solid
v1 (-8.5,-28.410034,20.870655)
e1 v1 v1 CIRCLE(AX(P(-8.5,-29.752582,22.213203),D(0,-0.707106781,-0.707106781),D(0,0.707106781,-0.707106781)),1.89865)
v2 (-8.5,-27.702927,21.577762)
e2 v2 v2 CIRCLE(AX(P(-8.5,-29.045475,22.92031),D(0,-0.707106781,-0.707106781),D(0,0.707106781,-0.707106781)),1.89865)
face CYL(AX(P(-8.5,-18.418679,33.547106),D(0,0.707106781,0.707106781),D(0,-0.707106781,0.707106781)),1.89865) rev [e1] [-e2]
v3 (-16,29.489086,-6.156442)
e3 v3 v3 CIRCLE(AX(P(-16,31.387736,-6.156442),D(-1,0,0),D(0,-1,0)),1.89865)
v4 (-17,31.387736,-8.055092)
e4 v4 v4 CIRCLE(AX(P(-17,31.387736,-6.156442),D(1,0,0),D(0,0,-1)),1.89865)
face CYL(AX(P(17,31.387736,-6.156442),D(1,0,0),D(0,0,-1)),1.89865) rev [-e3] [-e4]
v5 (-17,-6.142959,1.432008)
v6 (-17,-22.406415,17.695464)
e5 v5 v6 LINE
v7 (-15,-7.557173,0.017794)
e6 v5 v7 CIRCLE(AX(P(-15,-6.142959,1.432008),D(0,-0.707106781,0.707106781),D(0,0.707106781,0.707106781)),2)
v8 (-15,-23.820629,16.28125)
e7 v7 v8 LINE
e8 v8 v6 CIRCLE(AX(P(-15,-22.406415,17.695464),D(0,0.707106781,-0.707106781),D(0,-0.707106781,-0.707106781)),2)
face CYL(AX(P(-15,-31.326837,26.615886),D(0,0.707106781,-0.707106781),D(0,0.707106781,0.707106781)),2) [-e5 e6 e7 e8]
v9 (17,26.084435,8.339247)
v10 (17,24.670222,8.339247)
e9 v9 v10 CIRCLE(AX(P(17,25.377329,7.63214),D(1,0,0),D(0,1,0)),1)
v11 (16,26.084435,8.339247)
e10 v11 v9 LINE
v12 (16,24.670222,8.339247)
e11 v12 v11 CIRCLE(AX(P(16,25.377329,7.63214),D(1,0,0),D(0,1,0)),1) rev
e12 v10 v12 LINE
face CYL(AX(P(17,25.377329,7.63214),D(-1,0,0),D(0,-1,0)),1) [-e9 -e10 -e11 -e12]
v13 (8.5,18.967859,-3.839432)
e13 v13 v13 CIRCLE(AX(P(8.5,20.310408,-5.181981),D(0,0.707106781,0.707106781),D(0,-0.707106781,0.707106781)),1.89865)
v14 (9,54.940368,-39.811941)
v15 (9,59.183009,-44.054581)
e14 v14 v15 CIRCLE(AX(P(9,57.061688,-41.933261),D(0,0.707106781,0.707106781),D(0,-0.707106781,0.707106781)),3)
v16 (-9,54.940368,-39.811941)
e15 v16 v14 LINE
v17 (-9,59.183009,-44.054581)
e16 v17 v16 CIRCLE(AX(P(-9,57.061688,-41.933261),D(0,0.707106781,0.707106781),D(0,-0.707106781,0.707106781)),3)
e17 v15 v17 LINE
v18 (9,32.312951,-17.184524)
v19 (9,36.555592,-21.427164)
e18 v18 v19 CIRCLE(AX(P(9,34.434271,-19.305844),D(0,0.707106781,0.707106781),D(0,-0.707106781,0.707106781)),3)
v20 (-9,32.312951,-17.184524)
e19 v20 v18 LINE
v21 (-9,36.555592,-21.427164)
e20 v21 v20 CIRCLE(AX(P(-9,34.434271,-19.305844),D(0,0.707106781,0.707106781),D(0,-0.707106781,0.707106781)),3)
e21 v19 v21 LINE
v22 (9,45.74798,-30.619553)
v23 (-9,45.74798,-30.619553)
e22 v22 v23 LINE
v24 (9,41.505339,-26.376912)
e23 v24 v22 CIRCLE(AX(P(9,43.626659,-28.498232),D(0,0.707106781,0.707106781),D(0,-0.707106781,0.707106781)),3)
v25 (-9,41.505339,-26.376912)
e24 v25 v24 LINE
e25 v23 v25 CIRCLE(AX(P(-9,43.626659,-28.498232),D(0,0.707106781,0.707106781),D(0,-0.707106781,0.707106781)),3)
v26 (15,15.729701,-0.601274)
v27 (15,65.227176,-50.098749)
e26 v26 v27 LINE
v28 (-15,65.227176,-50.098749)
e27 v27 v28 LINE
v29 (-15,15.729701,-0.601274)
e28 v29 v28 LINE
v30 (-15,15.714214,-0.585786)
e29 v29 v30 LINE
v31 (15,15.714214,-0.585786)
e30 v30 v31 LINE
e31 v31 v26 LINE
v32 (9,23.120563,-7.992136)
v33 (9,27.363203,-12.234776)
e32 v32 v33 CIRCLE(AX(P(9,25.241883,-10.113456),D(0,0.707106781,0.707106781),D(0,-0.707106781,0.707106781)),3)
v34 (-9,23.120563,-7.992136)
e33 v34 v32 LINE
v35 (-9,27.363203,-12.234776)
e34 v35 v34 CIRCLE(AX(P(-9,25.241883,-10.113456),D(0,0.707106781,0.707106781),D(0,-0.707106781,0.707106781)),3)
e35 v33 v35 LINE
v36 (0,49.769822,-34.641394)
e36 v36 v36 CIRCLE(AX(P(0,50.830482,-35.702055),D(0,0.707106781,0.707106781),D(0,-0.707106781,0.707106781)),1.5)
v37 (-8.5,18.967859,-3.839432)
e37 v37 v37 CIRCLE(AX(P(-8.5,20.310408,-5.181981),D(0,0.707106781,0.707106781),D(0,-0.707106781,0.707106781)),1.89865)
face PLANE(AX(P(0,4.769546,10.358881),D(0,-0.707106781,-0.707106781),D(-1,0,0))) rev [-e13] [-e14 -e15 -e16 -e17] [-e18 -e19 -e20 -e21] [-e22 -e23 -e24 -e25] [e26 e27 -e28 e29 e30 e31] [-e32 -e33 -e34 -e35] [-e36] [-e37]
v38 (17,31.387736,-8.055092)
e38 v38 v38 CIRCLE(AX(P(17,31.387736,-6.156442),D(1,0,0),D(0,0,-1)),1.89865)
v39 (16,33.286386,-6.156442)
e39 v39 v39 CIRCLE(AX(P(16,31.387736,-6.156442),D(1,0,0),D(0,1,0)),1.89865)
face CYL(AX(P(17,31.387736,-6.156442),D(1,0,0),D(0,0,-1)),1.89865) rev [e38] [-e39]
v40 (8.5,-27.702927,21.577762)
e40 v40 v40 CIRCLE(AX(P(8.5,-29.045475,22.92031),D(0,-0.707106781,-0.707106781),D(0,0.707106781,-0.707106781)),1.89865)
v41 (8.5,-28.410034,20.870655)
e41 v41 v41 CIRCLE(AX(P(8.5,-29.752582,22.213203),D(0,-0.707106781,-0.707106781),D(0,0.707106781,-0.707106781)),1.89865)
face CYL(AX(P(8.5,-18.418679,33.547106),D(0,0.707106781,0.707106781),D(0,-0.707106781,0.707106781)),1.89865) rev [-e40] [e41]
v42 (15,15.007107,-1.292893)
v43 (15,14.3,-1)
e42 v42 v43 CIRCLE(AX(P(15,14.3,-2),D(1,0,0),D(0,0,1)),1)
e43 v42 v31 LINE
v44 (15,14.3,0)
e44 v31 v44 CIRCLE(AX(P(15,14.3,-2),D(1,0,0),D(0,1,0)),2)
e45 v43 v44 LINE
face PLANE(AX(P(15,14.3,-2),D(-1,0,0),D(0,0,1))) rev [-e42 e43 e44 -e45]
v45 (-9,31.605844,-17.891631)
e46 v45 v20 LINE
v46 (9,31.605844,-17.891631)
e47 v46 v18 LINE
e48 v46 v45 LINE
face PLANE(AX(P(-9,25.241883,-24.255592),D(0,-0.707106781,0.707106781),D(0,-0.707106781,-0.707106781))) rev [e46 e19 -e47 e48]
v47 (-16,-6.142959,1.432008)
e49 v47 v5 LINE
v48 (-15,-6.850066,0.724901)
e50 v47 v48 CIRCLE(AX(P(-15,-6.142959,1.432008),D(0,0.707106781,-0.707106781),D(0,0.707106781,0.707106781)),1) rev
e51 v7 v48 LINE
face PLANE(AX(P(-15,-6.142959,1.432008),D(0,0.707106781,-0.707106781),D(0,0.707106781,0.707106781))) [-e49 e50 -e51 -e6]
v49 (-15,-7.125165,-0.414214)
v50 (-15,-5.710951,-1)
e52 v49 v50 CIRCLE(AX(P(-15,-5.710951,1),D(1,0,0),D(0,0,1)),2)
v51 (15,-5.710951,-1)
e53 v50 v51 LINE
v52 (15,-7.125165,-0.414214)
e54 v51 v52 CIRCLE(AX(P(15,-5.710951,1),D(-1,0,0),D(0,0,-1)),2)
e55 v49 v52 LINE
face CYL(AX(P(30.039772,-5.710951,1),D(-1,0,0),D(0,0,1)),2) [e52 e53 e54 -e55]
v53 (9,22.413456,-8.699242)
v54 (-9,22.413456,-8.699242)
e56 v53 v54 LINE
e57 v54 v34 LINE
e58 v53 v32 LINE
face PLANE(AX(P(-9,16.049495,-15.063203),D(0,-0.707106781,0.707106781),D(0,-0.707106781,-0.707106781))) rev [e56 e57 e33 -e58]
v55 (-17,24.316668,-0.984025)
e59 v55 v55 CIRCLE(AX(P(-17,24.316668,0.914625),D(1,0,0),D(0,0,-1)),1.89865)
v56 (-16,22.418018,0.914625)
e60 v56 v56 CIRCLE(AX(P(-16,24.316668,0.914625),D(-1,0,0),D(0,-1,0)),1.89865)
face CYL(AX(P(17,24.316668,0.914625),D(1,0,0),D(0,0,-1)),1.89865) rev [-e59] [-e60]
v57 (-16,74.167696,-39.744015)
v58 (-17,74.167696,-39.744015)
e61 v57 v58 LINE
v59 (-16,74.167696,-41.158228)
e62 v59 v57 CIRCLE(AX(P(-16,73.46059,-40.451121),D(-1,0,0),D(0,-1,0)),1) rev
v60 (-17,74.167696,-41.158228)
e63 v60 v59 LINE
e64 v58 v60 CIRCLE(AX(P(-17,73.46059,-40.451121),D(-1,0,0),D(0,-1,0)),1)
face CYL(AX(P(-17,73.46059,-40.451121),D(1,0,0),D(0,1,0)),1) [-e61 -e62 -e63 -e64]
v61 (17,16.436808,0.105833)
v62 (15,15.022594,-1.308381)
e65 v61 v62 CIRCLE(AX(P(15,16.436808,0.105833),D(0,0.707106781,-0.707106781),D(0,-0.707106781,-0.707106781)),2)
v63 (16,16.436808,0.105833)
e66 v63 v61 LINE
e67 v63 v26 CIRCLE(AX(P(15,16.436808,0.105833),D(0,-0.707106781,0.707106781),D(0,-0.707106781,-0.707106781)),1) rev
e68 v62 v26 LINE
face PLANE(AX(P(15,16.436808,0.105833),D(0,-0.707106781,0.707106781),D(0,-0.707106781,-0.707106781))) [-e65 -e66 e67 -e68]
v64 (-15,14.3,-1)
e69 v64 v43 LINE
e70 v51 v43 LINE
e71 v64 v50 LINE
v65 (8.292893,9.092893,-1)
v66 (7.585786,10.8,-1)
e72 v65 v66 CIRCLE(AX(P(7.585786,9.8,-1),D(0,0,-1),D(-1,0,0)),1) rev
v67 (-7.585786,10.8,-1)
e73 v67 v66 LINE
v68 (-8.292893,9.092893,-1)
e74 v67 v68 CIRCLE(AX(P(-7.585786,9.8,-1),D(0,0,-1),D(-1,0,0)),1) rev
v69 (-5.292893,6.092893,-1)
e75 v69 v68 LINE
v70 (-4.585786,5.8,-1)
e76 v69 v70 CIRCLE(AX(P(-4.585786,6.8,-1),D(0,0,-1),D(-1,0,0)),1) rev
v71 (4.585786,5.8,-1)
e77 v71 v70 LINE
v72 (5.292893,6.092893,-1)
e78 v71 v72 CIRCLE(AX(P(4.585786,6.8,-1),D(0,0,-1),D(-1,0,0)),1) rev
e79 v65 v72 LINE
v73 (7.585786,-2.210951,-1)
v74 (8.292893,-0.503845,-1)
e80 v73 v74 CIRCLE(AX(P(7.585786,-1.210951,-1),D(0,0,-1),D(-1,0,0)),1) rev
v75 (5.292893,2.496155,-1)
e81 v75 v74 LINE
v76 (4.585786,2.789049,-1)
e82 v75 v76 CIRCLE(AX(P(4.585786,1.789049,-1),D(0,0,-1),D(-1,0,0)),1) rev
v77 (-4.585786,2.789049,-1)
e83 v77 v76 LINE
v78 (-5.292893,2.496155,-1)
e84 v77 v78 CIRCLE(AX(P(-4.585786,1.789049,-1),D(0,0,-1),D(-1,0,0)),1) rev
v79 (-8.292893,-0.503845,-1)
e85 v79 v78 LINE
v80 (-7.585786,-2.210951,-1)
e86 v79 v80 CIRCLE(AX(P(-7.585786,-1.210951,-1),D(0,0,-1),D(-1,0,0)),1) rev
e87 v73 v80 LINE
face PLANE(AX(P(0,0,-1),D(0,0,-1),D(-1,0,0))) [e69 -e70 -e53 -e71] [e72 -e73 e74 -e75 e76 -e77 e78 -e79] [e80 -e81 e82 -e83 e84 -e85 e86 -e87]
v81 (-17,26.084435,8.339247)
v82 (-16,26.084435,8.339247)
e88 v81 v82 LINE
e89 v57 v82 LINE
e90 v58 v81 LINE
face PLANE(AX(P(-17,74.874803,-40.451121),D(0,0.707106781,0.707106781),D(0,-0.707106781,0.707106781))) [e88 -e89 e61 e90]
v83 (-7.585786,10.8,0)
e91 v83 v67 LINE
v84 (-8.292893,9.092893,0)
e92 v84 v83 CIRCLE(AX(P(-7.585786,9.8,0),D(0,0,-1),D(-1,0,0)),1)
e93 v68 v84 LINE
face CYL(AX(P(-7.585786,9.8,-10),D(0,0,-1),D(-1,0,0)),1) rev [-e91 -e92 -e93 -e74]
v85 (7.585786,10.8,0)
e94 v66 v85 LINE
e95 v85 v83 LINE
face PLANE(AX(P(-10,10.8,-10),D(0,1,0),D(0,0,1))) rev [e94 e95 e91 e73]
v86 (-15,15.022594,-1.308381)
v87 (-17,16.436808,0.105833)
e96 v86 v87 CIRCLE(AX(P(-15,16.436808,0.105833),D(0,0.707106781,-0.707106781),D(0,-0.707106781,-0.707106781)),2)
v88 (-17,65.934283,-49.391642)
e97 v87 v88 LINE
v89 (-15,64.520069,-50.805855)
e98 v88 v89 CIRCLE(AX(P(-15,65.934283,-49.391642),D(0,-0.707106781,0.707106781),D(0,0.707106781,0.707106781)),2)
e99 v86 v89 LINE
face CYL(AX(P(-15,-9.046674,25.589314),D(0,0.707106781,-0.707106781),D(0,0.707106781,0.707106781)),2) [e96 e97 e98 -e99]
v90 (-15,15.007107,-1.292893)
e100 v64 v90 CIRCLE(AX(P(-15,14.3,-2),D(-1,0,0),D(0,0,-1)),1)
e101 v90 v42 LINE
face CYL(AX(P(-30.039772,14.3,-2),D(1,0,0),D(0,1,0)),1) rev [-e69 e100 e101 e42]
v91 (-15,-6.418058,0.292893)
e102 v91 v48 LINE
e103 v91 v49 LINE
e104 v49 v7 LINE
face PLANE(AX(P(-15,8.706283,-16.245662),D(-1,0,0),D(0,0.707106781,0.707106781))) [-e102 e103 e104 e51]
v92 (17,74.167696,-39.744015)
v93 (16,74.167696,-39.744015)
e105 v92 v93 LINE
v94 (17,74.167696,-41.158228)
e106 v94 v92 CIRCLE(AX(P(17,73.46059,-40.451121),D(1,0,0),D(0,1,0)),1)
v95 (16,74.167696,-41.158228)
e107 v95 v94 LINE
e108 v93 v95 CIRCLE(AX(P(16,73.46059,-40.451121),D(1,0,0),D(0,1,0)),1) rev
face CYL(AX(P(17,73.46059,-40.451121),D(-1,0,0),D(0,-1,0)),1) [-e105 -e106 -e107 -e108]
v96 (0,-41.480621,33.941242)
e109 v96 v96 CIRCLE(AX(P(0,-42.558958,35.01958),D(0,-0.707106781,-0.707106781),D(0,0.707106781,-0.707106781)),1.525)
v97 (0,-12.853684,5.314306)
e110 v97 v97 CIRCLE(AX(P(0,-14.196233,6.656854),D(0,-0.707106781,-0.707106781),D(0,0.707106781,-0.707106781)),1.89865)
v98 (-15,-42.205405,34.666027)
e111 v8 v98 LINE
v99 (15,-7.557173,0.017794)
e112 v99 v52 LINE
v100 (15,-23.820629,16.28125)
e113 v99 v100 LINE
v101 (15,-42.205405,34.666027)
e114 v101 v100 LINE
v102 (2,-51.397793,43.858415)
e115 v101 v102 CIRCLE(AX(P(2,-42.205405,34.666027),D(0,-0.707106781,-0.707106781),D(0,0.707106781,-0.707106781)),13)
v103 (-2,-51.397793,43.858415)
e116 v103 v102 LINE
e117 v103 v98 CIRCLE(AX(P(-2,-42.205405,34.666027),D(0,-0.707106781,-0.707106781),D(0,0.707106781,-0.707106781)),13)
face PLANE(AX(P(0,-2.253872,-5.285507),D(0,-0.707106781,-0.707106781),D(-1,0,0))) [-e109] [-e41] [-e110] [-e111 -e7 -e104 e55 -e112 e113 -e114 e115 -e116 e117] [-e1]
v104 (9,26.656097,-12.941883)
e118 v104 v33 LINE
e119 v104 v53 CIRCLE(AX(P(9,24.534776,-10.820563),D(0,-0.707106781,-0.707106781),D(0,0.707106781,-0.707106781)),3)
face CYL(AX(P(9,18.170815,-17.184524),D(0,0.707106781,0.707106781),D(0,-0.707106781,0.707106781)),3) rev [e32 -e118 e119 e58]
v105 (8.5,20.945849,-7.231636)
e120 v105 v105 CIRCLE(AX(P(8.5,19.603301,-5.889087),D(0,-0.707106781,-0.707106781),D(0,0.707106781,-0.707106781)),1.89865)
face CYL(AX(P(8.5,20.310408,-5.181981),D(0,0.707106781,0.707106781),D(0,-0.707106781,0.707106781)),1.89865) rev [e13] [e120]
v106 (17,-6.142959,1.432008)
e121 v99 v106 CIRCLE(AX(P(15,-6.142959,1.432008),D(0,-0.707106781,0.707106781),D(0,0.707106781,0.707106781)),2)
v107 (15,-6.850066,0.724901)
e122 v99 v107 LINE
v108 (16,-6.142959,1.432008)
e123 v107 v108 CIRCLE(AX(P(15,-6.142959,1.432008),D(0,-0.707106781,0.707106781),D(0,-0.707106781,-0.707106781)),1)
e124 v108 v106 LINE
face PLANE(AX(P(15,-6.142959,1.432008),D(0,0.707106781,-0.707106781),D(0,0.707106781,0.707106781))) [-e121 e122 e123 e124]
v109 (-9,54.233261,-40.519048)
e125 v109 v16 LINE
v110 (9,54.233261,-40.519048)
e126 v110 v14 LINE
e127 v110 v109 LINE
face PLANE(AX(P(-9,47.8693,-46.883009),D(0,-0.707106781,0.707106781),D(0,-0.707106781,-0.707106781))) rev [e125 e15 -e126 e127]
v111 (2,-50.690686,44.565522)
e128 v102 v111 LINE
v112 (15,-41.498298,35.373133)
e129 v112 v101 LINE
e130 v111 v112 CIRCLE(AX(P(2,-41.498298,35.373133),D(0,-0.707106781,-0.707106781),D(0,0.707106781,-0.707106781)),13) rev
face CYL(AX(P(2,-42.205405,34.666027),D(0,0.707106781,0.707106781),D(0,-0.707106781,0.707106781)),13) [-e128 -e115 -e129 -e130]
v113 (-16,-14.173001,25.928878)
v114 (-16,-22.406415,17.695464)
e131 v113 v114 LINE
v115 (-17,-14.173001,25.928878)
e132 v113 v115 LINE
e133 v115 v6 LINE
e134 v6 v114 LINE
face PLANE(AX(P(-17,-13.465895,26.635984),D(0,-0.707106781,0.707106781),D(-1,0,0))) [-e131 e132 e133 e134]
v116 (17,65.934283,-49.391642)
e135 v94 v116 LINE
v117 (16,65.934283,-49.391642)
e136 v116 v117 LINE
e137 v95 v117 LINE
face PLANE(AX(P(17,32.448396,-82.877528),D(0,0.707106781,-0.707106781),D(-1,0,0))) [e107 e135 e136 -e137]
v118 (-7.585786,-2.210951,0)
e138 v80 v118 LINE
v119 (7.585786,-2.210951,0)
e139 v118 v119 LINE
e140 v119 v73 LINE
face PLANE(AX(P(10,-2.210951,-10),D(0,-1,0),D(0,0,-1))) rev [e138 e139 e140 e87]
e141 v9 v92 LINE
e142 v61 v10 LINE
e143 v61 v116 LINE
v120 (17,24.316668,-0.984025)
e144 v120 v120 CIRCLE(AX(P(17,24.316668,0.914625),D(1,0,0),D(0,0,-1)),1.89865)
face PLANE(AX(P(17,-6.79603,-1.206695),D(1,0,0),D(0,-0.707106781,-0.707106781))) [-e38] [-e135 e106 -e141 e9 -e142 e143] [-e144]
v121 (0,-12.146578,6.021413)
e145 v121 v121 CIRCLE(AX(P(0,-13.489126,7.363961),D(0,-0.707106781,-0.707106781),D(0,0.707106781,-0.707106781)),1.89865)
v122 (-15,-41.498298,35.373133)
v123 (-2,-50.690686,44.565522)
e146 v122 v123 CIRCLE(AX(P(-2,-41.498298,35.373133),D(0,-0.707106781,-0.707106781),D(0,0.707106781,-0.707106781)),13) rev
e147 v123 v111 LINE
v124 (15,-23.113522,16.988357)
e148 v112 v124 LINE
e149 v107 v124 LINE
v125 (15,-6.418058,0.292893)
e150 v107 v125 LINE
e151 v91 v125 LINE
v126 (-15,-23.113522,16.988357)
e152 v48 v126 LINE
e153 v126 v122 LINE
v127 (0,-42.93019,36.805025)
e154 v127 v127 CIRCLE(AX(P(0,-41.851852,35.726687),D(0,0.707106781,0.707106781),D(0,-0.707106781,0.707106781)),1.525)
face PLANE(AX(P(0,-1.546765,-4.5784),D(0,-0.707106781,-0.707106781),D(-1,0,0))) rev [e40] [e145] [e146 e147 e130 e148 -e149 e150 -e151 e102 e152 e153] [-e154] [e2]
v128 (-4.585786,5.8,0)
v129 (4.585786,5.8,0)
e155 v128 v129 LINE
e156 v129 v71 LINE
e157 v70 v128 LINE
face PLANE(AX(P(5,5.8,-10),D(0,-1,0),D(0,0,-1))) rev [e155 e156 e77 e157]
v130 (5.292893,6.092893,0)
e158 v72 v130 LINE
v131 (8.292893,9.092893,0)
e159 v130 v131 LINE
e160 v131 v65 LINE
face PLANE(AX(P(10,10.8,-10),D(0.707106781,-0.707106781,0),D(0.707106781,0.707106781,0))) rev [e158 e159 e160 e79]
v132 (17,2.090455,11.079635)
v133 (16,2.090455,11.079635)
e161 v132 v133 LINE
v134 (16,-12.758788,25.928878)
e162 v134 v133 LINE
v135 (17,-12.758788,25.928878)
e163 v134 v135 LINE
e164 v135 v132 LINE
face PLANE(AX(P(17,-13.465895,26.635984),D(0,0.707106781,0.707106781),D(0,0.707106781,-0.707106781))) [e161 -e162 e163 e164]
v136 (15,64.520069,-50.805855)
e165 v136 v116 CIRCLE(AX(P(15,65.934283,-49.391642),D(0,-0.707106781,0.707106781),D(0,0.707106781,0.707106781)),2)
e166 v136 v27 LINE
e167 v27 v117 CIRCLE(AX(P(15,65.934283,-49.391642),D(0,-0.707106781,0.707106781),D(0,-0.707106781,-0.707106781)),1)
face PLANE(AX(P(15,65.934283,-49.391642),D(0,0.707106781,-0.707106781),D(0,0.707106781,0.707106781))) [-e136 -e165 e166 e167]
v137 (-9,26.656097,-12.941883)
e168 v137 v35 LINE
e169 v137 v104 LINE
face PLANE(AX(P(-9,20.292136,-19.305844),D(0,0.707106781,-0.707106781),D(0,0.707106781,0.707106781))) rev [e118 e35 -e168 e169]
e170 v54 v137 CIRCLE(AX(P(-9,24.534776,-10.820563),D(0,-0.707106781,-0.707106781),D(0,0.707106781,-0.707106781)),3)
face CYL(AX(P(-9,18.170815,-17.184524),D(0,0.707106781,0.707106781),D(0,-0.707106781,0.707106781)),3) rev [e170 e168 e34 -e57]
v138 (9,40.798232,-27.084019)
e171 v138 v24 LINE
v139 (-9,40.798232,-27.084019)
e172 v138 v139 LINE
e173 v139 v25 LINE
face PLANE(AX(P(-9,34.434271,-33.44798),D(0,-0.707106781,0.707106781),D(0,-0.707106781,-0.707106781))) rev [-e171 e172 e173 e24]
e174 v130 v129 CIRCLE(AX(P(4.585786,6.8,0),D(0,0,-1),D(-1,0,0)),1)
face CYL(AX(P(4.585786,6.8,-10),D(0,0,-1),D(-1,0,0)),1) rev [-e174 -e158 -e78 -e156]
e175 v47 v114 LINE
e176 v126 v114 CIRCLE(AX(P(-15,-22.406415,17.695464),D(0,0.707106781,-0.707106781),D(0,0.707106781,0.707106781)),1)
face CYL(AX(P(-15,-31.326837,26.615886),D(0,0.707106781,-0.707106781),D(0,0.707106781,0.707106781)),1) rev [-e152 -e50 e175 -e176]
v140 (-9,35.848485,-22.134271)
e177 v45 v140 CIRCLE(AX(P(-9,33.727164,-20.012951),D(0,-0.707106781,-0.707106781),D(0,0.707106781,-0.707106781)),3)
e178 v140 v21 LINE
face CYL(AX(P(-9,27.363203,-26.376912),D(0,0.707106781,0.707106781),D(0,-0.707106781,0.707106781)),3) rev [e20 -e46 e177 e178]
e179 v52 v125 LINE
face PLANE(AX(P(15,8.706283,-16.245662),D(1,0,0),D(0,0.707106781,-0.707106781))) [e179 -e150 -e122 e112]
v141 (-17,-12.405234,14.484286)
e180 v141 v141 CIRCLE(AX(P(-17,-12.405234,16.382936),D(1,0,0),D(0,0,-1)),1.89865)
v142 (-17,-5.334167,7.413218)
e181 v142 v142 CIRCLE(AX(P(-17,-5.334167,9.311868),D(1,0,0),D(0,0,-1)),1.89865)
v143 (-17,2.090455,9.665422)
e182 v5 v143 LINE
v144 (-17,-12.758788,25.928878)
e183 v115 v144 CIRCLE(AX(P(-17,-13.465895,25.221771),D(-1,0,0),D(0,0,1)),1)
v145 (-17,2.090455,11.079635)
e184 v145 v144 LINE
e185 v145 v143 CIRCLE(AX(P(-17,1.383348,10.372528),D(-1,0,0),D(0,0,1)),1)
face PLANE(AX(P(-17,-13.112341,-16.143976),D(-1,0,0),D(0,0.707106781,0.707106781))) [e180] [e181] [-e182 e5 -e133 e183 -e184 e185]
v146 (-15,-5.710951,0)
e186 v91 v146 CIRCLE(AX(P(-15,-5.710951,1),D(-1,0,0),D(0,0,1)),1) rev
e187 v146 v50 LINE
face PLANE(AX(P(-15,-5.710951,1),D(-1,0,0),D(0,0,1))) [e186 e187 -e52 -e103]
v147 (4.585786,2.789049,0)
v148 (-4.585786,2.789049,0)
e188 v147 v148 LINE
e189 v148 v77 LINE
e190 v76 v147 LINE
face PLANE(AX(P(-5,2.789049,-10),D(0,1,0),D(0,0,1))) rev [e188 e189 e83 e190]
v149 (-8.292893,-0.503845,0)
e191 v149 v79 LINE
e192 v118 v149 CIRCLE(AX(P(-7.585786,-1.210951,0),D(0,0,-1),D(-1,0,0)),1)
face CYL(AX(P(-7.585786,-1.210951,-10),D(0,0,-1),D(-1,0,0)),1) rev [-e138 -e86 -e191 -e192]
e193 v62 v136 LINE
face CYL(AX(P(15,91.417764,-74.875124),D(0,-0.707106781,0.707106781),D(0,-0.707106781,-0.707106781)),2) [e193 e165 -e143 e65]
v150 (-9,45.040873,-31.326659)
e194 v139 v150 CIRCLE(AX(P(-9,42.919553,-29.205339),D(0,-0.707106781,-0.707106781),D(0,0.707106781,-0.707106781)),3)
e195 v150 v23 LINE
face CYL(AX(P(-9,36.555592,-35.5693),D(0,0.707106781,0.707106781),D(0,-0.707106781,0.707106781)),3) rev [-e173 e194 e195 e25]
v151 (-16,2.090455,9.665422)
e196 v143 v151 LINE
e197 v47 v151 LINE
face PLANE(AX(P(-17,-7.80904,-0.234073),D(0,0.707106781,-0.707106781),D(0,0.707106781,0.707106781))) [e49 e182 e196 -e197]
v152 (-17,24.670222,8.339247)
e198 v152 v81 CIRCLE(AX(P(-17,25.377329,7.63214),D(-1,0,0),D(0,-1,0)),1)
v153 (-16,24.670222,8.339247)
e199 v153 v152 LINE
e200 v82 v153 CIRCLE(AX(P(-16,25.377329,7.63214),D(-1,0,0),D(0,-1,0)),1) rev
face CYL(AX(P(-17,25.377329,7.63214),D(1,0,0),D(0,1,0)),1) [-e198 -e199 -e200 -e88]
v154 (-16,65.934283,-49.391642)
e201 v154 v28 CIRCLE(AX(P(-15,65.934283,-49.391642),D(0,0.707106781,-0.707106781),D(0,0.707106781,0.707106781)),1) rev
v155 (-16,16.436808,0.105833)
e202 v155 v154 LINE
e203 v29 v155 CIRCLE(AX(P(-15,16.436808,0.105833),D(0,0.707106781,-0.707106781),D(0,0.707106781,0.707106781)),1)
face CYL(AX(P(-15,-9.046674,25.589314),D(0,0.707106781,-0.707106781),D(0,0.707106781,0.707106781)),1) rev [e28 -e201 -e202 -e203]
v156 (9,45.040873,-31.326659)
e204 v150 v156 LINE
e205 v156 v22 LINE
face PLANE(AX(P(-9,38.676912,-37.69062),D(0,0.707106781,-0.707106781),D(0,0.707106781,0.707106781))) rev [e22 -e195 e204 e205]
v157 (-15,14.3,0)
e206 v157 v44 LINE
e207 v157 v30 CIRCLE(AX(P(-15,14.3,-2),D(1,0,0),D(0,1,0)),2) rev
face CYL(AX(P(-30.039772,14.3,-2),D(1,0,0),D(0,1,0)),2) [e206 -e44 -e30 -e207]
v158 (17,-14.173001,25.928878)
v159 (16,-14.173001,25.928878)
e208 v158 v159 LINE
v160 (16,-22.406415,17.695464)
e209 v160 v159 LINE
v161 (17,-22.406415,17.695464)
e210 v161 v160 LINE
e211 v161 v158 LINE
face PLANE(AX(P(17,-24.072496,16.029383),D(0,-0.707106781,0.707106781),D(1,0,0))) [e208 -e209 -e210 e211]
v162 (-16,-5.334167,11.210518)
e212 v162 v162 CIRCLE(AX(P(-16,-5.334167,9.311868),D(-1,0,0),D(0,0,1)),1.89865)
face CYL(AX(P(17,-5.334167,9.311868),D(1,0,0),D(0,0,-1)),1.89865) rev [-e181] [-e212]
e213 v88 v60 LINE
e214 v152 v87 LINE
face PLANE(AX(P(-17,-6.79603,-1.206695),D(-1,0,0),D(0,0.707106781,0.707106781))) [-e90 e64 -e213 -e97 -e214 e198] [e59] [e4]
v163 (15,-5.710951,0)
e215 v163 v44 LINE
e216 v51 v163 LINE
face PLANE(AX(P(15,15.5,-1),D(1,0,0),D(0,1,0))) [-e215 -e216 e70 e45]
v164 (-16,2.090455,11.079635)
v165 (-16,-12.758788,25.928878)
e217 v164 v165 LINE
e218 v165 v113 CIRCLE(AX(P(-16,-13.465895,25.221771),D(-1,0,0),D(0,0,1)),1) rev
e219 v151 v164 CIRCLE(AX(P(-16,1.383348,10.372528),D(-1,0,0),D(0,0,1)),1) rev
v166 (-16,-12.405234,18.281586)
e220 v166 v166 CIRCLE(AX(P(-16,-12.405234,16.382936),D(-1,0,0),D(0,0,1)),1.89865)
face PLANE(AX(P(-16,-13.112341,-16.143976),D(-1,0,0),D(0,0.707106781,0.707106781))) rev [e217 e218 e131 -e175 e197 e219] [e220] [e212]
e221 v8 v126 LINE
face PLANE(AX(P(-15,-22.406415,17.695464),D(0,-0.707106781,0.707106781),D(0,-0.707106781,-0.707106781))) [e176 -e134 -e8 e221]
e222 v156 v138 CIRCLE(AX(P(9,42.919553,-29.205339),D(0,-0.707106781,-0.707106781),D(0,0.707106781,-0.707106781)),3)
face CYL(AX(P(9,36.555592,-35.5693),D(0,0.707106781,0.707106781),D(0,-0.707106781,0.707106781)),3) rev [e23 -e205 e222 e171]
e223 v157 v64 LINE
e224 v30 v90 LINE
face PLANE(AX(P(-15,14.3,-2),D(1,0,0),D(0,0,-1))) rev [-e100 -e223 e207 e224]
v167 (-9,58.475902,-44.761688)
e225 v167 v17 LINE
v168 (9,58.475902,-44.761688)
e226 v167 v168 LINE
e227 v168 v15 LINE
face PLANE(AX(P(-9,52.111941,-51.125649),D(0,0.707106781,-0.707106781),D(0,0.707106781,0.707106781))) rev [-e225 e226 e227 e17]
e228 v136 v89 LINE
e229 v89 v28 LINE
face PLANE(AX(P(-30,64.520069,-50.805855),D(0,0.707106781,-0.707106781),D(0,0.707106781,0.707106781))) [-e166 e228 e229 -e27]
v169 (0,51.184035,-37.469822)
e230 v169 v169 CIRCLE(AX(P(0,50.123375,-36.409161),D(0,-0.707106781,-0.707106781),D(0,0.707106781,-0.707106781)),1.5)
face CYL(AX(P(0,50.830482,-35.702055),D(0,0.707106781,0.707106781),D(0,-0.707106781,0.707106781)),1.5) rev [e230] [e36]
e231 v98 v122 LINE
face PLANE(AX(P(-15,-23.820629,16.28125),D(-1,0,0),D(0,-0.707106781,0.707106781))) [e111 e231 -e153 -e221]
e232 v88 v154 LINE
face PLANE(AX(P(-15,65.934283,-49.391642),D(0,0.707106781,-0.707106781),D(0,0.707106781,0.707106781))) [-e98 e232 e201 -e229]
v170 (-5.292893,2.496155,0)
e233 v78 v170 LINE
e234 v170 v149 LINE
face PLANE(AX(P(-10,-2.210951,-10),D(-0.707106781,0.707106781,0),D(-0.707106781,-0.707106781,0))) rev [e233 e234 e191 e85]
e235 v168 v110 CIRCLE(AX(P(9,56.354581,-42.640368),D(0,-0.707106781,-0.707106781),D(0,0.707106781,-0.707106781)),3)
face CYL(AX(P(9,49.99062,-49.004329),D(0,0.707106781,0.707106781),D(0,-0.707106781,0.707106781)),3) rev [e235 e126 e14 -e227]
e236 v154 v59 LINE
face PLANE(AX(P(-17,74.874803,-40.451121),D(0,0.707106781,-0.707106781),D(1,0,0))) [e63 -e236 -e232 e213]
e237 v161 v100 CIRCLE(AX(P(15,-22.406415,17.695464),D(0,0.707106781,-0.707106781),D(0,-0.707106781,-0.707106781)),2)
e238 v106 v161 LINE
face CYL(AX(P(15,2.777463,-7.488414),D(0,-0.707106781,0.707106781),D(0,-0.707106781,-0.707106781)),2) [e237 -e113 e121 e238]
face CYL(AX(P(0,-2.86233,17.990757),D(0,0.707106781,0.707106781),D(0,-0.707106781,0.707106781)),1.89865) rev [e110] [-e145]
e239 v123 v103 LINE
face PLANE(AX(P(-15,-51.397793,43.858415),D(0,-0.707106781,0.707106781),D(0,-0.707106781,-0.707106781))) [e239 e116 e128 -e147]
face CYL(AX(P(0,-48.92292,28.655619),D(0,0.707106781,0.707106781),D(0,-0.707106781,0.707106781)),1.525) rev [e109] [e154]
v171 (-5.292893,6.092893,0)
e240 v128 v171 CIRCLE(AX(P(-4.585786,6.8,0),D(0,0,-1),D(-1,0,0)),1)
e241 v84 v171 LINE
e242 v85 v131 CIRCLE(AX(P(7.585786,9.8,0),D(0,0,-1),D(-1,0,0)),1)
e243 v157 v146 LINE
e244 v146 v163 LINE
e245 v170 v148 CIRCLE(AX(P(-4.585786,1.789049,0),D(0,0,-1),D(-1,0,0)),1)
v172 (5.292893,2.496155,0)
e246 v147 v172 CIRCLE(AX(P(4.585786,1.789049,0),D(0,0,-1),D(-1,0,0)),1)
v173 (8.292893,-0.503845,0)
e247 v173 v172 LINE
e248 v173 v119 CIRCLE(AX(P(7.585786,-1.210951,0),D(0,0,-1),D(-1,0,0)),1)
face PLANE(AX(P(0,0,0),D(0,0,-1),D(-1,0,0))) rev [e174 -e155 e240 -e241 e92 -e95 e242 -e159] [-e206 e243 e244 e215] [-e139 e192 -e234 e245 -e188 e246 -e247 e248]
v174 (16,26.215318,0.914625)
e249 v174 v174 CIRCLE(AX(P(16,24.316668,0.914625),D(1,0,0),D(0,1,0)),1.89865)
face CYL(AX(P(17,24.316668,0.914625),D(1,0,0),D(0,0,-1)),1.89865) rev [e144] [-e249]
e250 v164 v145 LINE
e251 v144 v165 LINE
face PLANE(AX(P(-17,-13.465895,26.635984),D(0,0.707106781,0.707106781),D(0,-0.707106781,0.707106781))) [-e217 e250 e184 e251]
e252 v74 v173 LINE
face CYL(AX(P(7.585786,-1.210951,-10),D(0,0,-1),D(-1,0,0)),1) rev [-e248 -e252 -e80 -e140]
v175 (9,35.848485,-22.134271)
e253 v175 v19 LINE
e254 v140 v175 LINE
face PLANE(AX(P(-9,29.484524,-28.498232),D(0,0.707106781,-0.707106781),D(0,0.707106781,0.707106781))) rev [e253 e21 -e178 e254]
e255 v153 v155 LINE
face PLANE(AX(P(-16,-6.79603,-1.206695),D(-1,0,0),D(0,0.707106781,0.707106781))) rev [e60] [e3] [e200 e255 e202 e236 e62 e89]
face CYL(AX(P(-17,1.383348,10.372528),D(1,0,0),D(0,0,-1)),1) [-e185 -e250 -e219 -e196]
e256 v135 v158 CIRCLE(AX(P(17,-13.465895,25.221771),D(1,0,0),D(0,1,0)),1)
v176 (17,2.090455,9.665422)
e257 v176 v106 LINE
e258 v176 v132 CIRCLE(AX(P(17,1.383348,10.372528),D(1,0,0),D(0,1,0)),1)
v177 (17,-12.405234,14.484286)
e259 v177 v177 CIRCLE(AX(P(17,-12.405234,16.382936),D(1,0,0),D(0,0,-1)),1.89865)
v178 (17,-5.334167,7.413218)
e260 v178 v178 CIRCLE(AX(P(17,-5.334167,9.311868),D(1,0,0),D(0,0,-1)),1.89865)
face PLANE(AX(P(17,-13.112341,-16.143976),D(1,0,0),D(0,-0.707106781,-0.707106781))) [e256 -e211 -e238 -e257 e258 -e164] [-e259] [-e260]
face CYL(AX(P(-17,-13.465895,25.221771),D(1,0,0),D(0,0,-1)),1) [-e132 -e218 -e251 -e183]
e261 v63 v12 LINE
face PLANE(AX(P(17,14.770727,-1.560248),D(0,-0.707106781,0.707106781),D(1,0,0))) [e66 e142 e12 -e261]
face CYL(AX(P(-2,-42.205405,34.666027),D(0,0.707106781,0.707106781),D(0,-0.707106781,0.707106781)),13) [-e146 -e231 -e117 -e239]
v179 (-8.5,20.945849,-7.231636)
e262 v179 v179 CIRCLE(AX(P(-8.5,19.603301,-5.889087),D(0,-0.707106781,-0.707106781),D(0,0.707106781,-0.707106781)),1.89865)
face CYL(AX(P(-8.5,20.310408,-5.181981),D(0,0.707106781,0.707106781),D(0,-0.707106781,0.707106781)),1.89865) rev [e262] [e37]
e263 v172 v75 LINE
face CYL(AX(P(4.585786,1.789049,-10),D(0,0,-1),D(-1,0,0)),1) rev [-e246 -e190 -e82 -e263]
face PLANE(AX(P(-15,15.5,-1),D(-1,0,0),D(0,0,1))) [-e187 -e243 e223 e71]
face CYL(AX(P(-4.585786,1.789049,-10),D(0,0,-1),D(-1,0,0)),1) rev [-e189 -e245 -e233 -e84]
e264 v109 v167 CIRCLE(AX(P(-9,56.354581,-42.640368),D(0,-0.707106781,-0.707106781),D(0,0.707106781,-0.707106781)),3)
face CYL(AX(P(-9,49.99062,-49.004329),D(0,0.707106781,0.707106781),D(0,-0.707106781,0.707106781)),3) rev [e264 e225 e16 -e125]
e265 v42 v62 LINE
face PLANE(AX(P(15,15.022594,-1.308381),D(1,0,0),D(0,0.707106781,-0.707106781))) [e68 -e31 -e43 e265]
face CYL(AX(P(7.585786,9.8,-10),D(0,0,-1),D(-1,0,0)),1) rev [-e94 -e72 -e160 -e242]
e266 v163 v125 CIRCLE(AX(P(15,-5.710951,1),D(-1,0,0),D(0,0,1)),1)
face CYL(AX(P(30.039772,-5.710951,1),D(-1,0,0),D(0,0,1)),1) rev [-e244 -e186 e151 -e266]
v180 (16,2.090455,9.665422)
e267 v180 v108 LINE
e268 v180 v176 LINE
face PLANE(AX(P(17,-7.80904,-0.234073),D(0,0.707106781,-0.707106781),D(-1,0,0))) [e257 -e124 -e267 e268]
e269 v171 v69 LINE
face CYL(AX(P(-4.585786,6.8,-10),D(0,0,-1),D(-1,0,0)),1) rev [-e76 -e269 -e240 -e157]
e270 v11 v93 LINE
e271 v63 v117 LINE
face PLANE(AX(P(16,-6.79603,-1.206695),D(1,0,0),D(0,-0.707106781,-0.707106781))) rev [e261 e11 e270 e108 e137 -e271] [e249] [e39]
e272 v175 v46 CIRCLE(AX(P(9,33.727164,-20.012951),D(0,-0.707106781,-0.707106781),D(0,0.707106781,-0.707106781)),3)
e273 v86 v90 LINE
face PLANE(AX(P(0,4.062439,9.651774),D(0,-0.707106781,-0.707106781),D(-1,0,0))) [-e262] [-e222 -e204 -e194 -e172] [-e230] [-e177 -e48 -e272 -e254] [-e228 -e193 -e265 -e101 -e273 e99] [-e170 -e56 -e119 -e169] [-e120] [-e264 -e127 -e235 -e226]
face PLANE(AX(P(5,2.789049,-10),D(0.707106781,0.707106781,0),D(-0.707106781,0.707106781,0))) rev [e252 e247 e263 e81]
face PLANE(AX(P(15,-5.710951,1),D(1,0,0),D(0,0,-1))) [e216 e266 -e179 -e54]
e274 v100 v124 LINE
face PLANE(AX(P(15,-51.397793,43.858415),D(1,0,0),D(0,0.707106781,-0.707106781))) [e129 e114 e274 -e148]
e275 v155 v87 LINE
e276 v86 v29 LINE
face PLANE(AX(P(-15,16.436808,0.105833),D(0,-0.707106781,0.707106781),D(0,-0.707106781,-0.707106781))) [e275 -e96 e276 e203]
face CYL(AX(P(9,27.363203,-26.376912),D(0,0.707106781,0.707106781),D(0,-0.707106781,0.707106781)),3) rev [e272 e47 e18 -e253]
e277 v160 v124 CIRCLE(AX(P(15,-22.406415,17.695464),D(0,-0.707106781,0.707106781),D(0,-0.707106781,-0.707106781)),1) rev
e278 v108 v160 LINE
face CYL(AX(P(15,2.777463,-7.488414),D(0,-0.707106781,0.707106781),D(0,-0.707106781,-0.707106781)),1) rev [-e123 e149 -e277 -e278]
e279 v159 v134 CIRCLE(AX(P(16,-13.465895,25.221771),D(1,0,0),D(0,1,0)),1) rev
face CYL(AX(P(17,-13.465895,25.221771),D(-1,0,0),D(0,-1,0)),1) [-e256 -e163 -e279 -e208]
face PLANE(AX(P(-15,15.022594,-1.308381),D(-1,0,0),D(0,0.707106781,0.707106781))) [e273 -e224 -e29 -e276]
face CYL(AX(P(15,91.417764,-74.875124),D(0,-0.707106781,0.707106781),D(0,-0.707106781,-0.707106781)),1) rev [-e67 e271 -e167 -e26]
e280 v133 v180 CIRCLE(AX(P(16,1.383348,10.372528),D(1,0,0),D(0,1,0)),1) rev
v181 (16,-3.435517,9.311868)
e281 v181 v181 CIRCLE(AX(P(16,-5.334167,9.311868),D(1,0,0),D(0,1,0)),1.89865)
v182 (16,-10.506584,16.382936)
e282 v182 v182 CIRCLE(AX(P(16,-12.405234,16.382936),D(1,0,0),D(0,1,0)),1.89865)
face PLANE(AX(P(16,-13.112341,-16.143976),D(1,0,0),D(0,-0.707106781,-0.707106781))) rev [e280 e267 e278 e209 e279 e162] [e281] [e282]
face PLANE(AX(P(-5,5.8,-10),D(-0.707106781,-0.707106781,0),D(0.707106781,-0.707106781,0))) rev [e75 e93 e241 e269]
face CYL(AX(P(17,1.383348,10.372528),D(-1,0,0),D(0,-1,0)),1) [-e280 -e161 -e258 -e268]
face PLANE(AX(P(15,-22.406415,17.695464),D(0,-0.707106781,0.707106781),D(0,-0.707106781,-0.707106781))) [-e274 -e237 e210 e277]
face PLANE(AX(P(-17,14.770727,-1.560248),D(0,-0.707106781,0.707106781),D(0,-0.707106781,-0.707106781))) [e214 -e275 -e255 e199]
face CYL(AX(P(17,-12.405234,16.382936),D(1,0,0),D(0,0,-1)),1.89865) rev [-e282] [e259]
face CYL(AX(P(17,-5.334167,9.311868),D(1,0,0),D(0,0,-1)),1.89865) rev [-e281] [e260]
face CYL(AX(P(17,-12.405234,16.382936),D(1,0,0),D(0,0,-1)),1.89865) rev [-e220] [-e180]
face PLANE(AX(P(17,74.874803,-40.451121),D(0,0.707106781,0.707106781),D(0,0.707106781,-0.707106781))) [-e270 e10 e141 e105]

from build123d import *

# Parameters (mm, degrees)
BASE_FLANGE1_DEPTH     = 1
SKETCHED_START         = -30
SKETCHED_BEND5_DEPTH   = 60
SKETCHED_BEND5_2_DEPTH = 15
SKETCHED_START_2       = 15
SKETCHED_BEND5_3_DEPTH = 15
SKETCHED_BEND5_4_DEPTH = 60
SKETCHED_START_3       = -15
SKETCHED_BEND5_5_DEPTH = 30
SKETCHED_BEND6_DEPTH   = 60
SKETCHED_BEND6_2_DEPTH = 15
SKETCHED_BEND6_3_DEPTH = 15
SKETCHED_BEND6_4_DEPTH = 30
SKETCHED_BEND6_5_DEPTH = 60
SKETCHED_START_4       = -28.356310605
SKETCHED_BEND7_DEPTH   = 23
SKETCHED_BEND7_2_DEPTH = 23
SKETCHED_START_5       = 11.547743288
SKETCHED_BEND8_DEPTH   = 70
SKETCHED_BEND8_2_DEPTH = 70
CUT_EXTRUDE1_DEPTH     = 10
F_6_CLEARANCE_HOLE4_D  = 3.7973
F_6_CLEARANCE_HOLE2_D  = 3.7973
F_3_0MM_DOWEL_HOLE1_D  = 3
SKETCH47_R             = 1.525
CUT_EXTRUDE2_DEPTH     = 10
CUT_EXTRUDE3_DEPTH     = 10
FILLET2_R              = 13
FILLET1_R              = 1


# Read off the part's stored shape, not the designer's step: Sketched Bend5, Sketched Bend6, Sketched Bend7, Sketched Bend8
# Sheet-metal steps are written as plain solids
with BuildPart() as part:
    # Sketch1 → Base-Flange1 (new body)
    with BuildSketch(Plane.XY):
        Polygon((-30, -30.5), (-15, -30.5), (-15, -69.5), (15, -69.5), (15, -30.5), (30, -30.5), (30, -7.5), (15, -7.5), (15, 15.5), (30, 15.5), (30, 85.5), (-30, 85.5), (-30, 15.5), (-15, 15.5), (-15, -7.5), (-30, -7.5), align=None)
    extrude(amount=-BASE_FLANGE1_DEPTH)

    # Sketched Bend5 outline → Sketched Bend5 (cut)
    with BuildSketch(Plane.YZ.offset(SKETCHED_START)):
        with BuildLine():
            Line((15.714213562, -0.585786438), (16.128427124, -1))
            Line((16.128427124, -1), (85.5, -1))
            Line((85.5, -1), (85.5, 0))
            Line((85.5, 0), (14.3, 0))
            ThreePointArc((14.3, 0), (15.065366865, -0.152240935), (15.714213562, -0.585786438))
        make_face()
    extrude(amount=SKETCHED_BEND5_DEPTH, mode=Mode.SUBTRACT)

    # Sketched Bend5 2 outline → Sketched Bend5 2 (cut)
    with BuildSketch(Plane.YZ.offset(SKETCHED_START)):
        with BuildLine():
            Line((15.729701149, -0.601274024), (15.714213562, -0.585786438))
            ThreePointArc((15.714213562, -0.585786438), (15.610403483, -0.48909209), (15.5, -0.4))
            Line((15.5, -0.4), (15.5, -0.830975173))
            Line((15.5, -0.830975173), (15.729701149, -0.601274024))
        make_face()
    extrude(amount=SKETCHED_BEND5_2_DEPTH, mode=Mode.SUBTRACT)

    # Sketched Bend5 3 outline → Sketched Bend5 3 (cut)
    with BuildSketch(Plane.YZ.offset(SKETCHED_START_2)):
        with BuildLine():
            Line((15.729701149, -0.601274024), (15.714213562, -0.585786438))
            ThreePointArc((15.714213562, -0.585786438), (15.610403483, -0.48909209), (15.5, -0.4))
            Line((15.5, -0.4), (15.5, -0.830975173))
            Line((15.5, -0.830975173), (15.729701149, -0.601274024))
        make_face()
    extrude(amount=SKETCHED_BEND5_3_DEPTH, mode=Mode.SUBTRACT)

    # Sketched Bend5 4 outline → Sketched Bend5 4 (add)
    with BuildSketch(Plane.YZ.offset(SKETCHED_START)):
        Polygon((65.227175832, -50.098748707), (16.128427124, -1), (15.5, -1), (15.5, -0.830975173), (15.022594368, -1.308380805), (64.520069051, -50.805855488), align=None)
    extrude(amount=SKETCHED_BEND5_4_DEPTH)

    # Sketched Bend5 5 outline → Sketched Bend5 5 (add)
    with BuildSketch(Plane.YZ.offset(SKETCHED_START_3)):
        with BuildLine():
            Line((15.022594368, -1.308380805), (15.330975173, -1))
            Line((15.330975173, -1), (14.3, -1))
            ThreePointArc((14.3, -1), (14.682683432, -1.076120467), (15.007106781, -1.292893219))
            Line((15.007106781, -1.292893219), (15.022594368, -1.308380805))
        make_face()
    extrude(amount=SKETCHED_BEND5_5_DEPTH)

    # Sketched Bend6 outline → Sketched Bend6 (cut)
    with BuildSketch(Plane.YZ.offset(SKETCHED_START)):
        with BuildLine():
            ThreePointArc((-5.710951377, -1), (-6.476318242, -0.847759065), (-7.12516494, -0.414213562))
            Line((-7.12516494, -0.414213562), (-7.539378502, 0))
            Line((-7.539378502, 0), (-69.5, 0))
            Line((-69.5, 0), (-69.5, -1))
            Line((-69.5, -1), (-5.710951377, -1))
        make_face()
    extrude(amount=SKETCHED_BEND6_DEPTH, mode=Mode.SUBTRACT)

    # Sketched Bend6 2 outline → Sketched Bend6 2 (cut)
    with BuildSketch(Plane.YZ.offset(SKETCHED_START)):
        Polygon((-7.539378502, 0), (-7.5, -0.039378502), (-7.5, 0), align=None)
    extrude(amount=SKETCHED_BEND6_2_DEPTH, mode=Mode.SUBTRACT)

    # Sketched Bend6 3 outline → Sketched Bend6 3 (cut)
    with BuildSketch(Plane.YZ.offset(SKETCHED_START_2)):
        Polygon((-7.539378502, 0), (-7.5, -0.039378502), (-7.5, 0), align=None)
    extrude(amount=SKETCHED_BEND6_3_DEPTH, mode=Mode.SUBTRACT)

    # Sketched Bend6 4 outline → Sketched Bend6 4 (add)
    with BuildSketch(Plane.YZ.offset(SKETCHED_START_3)):
        with BuildLine():
            Line((-7.539378502, 0), (-5.710951377, 0))
            ThreePointArc((-5.710951377, 0), (-6.09363481, 0.076120467), (-6.418058159, 0.292893219))
            Line((-6.418058159, 0.292893219), (-50.690686454, 44.565521514))
            Line((-50.690686454, 44.565521514), (-51.397793235, 43.858414733))
            Line((-51.397793235, 43.858414733), (-7.539378502, 0))
        make_face()
    extrude(amount=SKETCHED_BEND6_4_DEPTH)

    # Sketched Bend6 5 outline → Sketched Bend6 5 (add)
    with BuildSketch(Plane.YZ.offset(SKETCHED_START)):
        Polygon((-23.820628769, 16.281250267), (-7.557172802, 0.0177943), (-6.850066021, 0.724901081), (-23.113521988, 16.988357048), align=None)
    extrude(amount=SKETCHED_BEND6_5_DEPTH)

    # Sketched Bend7 outline → Sketched Bend7 (cut)
    with BuildSketch(Plane(origin=(0, 0, 0), x_dir=(1, 0, 0), z_dir=(0, 0.707106781186546, -0.707106781186549)).offset(SKETCHED_START_4)):
        with BuildLine():
            ThreePointArc((-16.732050807, 4.331145665), (-16, 5.063196472), (-15, 5.331145665))
            Line((-15, 5.331145665), (-30, 5.331145665))
            Line((-30, 5.331145665), (-30, 4.331145665))
            Line((-30, 4.331145665), (-16.732050807, 4.331145665))
        make_face()
        with BuildLine():
            Line((30, 5.331145665), (15, 5.331145665))
            ThreePointArc((15, 5.331145665), (16, 5.063196472), (16.732050807, 4.331145665))
            Line((16.732050807, 4.331145665), (30, 4.331145665))
            Line((30, 4.331145665), (30, 5.331145665))
        make_face()
    extrude(amount=SKETCHED_BEND7_DEPTH, mode=Mode.SUBTRACT)

    # Sketched Bend7 2 outline → Sketched Bend7 2 (add)
    with BuildSketch(Plane(origin=(0, 0, 0), x_dir=(1, 0, 0), z_dir=(0, 0.707106781186546, -0.707106781186549)).offset(SKETCHED_START_4)):
        with BuildLine():
            Line((-15, 4.331145665), (-16.732050807, 4.331145665))
            ThreePointArc((-16.732050807, 4.331145665), (-16.931851652, 3.848783755), (-17, 3.331145665))
            Line((-17, 3.331145665), (-17, -9.312659845))
            Line((-17, -9.312659845), (-16, -9.312659845))
            Line((-16, -9.312659845), (-16, 3.331145665))
            ThreePointArc((-16, 3.331145665), (-15.707106781, 4.038252446), (-15, 4.331145665))
        make_face()
        with BuildLine():
            ThreePointArc((17, 3.331145665), (16.931851652, 3.848783755), (16.732050807, 4.331145665))
            Line((16.732050807, 4.331145665), (15, 4.331145665))
            ThreePointArc((15, 4.331145665), (15.707106781, 4.038252446), (16, 3.331145665))
            Line((16, 3.331145665), (16, -9.312659845))
            Line((16, -9.312659845), (17, -9.312659845))
            Line((17, -9.312659845), (17, 3.331145665))
        make_face()
    extrude(amount=SKETCHED_BEND7_2_DEPTH)

    # Sketched Bend8 outline → Sketched Bend8 (cut)
    with BuildSketch(Plane(origin=(0, 0, 0), x_dir=(1, 0, 0), z_dir=(0, 0.707106781186546, -0.707106781186549)).offset(SKETCHED_START_5)):
        with BuildLine():
            Line((-30, -10.697413409), (-16.732050808, -10.697413409))
            ThreePointArc((-16.732050808, -10.697413409), (-16, -9.965362601), (-15, -9.697413409))
            Line((-15, -9.697413409), (-30, -9.697413409))
            Line((-30, -9.697413409), (-30, -10.697413409))
        make_face()
        with BuildLine():
            Line((30, -9.697413409), (15, -9.697413409))
            ThreePointArc((15, -9.697413409), (16, -9.965362601), (16.732050808, -10.697413409))
            Line((16.732050808, -10.697413409), (30, -10.697413409))
            Line((30, -10.697413409), (30, -9.697413409))
        make_face()
    extrude(amount=SKETCHED_BEND8_DEPTH, mode=Mode.SUBTRACT)

    # Sketched Bend8 2 outline → Sketched Bend8 2 (add)
    with BuildSketch(Plane(origin=(0, 0, 0), x_dir=(1, 0, 0), z_dir=(0, 0.707106781186546, -0.707106781186549)).offset(SKETCHED_START_5)):
        with BuildLine():
            ThreePointArc((-16.732050808, -10.697413409), (-16.931851653, -11.179775319), (-17, -11.697413409))
            Line((-17, -11.697413409), (-17, -24.341218918))
            Line((-17, -24.341218918), (-16, -24.341218918))
            Line((-16, -24.341218918), (-16, -11.697413409))
            ThreePointArc((-16, -11.697413409), (-15.707106781, -10.990306628), (-15, -10.697413409))
            Line((-15, -10.697413409), (-16.732050808, -10.697413409))
        make_face()
        with BuildLine():
            Line((16.732050808, -10.697413409), (15, -10.697413409))
            ThreePointArc((15, -10.697413409), (15.707106781, -10.990306628), (16, -11.697413409))
            Line((16, -11.697413409), (16, -24.341218918))
            Line((16, -24.341218918), (17, -24.341218918))
            Line((17, -24.341218918), (17, -11.697413409))
            ThreePointArc((17, -11.697413409), (16.931851653, -11.179775319), (16.732050808, -10.697413409))
        make_face()
    extrude(amount=SKETCHED_BEND8_2_DEPTH)

    # Sketch36 → Cut-Extrude1 (cut)
    with BuildSketch(Plane(origin=(0, 7.564213562, 7.564213562), x_dir=(1, 0, 0), z_dir=(0, 0.7071067811865487, 0.7071067811865465))):
        with BuildLine():
            Line((-9, 28), (9, 28))
            ThreePointArc((9, 28), (12, 25), (9, 22))
            Line((9, 22), (-9, 22))
            ThreePointArc((-9, 22), (-12, 25), (-9, 28))
        make_face()
        with BuildLine():
            Line((-9, 41), (9, 41))
            ThreePointArc((9, 41), (12, 38), (9, 35))
            Line((9, 35), (-9, 35))
            ThreePointArc((-9, 35), (-12, 38), (-9, 41))
        make_face()
        with BuildLine():
            Line((-9, 54), (9, 54))
            ThreePointArc((9, 54), (12, 51), (9, 48))
            Line((9, 48), (-9, 48))
            ThreePointArc((-9, 48), (-12, 51), (-9, 54))
        make_face()
        with BuildLine():
            Line((-9, 73), (9, 73))
            ThreePointArc((9, 73), (12, 70), (9, 67))
            Line((9, 67), (-9, 67))
            ThreePointArc((-9, 67), (-12, 70), (-9, 73))
        make_face()
    extrude(amount=-CUT_EXTRUDE1_DEPTH, mode=Mode.SUBTRACT)

    # #6 Clearance Hole4 (through all)
    with Locations(Plane(origin=(0, 7.564213562, 7.564213562), x_dir=(1, 0, 0), z_dir=(0, 0.7071067811865487, 0.7071067811865465))):
        with Locations((-8.5, 18.025840533), (8.5, 18.025840533), (0, -14.745359227), (-8.5, -36.745359227), (8.5, -36.745359227)):
            Hole(F_6_CLEARANCE_HOLE4_D / 2)

    # #6 Clearance Hole2 (through all)
    with Locations(Plane(origin=(17, 0, 0), x_dir=(0, 0, -1), z_dir=(1, 0, 0))):
        with Locations((-9.311868306, -5.334166607), (-16.382936118, -12.405234419), (-0.914625389, 24.316668374), (6.156442422, 31.387736186)):
            Hole(F_6_CLEARANCE_HOLE2_D / 2)

    # Ø3.0mm Dowel Hole1 (through all)
    with Locations(Plane(origin=(0, 7.564213562, 7.564213562), x_dir=(1, 0, 0), z_dir=(0, 0.7071067811865487, 0.7071067811865465))):
        with Locations((0, 61.187743288)):
            Hole(F_3_0MM_DOWEL_HOLE1_D / 2)

    # Sketch47 → Cut-Extrude2 (cut)
    with BuildSketch(Plane(origin=(0, -3.06258247, -3.06258247), x_dir=(1, 0, 0), z_dir=(0, 0.7071067811865487, 0.7071067811865465))):
        with Locations(Location((0, -54.856310605, 0), (0, 0, 270))):
            Circle(SKETCH47_R)
    extrude(amount=-CUT_EXTRUDE2_DEPTH, mode=Mode.SUBTRACT)

    # Sketch48 → Cut-Extrude3 (cut)
    with BuildSketch(Plane.XY):
        Polygon((-10, 10.8), (10, 10.8), (5, 5.8), (-5, 5.8), align=None)
        Polygon((-10, -2.210951377), (-5, 2.789048623), (5, 2.789048623), (10, -2.210951377), align=None)
    extrude(amount=-CUT_EXTRUDE3_DEPTH, mode=Mode.SUBTRACT)

    # Fillet2
    fillet2_edges = [part.edges().sort_by_distance(p)[0] for p in [
        (-15, -51.044239844, 44.211968124),
        (15, -51.044239844, 44.211968124),
    ]]
    fillet(fillet2_edges, radius=FILLET2_R)

    # Fillet1
    fillet1_edges = [part.edges().sort_by_distance(p)[0] for p in [
        (-16.5, -13.465894591, 26.635984446),
        (-16.5, 2.797561376, 10.372528478),
        (16.5, 2.797561376, 10.372528478),
        (16.5, -13.465894591, 26.635984446),
        (-16.5, 25.377328546, 9.046353373),
        (-16.5, 74.874803229, -40.45112131),
        (16.5, 74.874803229, -40.45112131),
        (16.5, 25.377328546, 9.046353373),
        (-5, 5.8, -0.5),
        (-10, 10.8, -0.5),
        (10, 10.8, -0.5),
        (5, 5.8, -0.5),
        (10, -2.210951377, -0.5),
        (-10, -2.210951377, -0.5),
        (-5, 2.789048623, -0.5),
        (5, 2.789048623, -0.5),
    ]]
    fillet(fillet1_edges, radius=FILLET1_R)


solid = part.part
